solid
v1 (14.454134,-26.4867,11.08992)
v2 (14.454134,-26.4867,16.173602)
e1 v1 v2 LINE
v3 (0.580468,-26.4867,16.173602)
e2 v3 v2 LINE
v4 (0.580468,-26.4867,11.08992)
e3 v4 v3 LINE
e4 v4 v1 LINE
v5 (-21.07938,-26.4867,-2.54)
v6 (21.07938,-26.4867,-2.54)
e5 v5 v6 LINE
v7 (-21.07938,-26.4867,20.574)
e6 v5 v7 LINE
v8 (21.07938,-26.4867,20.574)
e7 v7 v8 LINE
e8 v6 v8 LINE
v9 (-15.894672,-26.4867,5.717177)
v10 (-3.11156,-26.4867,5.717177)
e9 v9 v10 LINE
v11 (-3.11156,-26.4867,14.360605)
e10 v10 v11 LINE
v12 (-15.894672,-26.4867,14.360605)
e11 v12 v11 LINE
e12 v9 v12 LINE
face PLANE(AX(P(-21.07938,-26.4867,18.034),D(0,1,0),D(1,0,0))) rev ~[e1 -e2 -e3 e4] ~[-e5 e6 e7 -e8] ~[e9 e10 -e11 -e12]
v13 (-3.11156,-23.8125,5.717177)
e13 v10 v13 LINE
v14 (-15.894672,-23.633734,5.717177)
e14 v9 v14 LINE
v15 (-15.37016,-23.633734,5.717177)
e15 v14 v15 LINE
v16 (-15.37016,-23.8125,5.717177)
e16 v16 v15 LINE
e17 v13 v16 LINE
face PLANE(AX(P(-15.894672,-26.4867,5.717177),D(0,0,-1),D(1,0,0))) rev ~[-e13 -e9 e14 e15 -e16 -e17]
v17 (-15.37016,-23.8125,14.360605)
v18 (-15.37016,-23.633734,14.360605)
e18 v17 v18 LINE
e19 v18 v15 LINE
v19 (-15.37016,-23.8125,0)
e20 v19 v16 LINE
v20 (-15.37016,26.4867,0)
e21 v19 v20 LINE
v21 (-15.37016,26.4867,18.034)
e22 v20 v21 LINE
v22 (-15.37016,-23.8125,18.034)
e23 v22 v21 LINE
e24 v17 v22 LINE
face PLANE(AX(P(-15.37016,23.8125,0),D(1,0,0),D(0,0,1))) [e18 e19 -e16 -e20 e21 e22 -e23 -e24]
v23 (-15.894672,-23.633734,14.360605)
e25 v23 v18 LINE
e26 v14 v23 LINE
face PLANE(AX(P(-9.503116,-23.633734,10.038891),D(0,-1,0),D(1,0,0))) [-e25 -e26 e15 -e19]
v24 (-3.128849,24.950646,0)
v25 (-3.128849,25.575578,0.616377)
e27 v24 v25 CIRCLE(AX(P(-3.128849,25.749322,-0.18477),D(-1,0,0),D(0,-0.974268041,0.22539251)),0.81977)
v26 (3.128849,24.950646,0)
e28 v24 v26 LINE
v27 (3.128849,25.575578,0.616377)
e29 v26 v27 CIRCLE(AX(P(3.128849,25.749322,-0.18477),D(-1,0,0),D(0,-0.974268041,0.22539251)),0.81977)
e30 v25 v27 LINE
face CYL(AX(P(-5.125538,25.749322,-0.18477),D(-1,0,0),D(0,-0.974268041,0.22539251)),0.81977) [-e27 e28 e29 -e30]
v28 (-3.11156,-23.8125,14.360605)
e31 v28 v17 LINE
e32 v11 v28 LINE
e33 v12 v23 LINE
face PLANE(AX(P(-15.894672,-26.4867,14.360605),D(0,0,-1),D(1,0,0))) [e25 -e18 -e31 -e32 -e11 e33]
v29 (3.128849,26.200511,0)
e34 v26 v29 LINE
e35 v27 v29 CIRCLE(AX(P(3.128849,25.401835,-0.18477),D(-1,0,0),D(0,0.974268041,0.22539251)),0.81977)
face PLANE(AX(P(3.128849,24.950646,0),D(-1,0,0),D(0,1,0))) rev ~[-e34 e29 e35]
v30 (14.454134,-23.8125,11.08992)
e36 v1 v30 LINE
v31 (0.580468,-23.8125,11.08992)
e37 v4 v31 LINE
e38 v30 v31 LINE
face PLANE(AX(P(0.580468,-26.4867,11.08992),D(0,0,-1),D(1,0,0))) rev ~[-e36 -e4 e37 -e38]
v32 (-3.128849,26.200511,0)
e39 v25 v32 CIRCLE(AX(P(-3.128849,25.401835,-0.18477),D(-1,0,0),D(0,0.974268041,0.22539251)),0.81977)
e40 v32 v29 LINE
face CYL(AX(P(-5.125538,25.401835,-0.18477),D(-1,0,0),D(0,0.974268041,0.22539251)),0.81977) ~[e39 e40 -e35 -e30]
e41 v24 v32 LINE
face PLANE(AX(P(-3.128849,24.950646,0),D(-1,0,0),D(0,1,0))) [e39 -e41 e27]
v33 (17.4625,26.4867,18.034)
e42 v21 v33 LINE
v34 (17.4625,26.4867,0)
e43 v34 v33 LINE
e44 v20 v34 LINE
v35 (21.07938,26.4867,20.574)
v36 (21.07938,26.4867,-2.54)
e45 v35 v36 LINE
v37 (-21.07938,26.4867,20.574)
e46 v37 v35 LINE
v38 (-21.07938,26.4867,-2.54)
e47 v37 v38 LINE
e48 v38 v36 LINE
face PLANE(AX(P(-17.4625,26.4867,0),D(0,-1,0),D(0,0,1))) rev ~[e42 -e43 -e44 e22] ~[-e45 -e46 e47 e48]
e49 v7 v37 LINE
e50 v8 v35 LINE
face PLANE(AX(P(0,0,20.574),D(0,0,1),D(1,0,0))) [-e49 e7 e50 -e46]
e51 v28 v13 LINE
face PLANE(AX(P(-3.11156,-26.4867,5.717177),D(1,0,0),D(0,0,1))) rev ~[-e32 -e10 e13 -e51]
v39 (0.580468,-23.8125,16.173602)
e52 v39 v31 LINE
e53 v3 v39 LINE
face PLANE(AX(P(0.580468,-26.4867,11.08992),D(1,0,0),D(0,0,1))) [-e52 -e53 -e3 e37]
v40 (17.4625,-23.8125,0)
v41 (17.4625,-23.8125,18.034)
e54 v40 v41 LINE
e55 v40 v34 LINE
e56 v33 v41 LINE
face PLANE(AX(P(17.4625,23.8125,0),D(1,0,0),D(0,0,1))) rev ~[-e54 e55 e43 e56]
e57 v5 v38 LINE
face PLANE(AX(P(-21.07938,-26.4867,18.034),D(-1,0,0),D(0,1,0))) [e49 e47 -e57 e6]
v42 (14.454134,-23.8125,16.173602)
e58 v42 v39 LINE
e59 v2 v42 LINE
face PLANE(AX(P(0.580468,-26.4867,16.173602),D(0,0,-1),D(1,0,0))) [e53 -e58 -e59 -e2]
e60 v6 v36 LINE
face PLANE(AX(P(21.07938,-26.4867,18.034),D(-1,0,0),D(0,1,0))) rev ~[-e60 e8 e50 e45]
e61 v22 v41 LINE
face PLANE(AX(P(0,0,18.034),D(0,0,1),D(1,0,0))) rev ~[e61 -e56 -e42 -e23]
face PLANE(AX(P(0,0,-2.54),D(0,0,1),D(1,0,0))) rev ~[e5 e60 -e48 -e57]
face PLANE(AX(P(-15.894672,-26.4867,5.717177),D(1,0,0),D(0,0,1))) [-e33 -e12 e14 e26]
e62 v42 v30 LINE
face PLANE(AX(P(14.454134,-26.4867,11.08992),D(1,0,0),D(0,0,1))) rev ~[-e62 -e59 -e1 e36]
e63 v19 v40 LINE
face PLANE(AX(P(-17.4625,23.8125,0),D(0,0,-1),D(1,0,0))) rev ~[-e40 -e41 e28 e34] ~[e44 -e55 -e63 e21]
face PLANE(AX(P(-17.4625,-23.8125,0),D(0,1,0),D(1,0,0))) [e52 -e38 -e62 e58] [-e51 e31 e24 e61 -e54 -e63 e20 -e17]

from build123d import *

# Parameters (mm, degrees)
F0_W         = 42.1587601304
F0_H         = 52.9734008014
F0_W_2       = 34.925
F0_H_2       = 47.625
F1_DEPTH     = 18.034
F2_DEPTH     = 2.54
F3_W         = 34.925
F3_H         = 18.034
F2_FACE_W    = 42.1587601304
F2_FACE_H    = 20.574
F4_DEPTH     = 10.32974
F5_W         = 42.1587601304
F5_H         = 52.9734008014
F6_DEPTH     = 2.54
F7_W         = 13.8736660592
F7_H         = 5.0836820155
F8_DEPTH     = 25.4
F9_W         = 6.2576979399
F9_H         = 1.2498646975
F10_DEPTH    = 0.635
F11_T1_DEPTH = 10.2510766125
F12_DEPTH    = 2.0923395641
F13_W        = 12.7831122372
F13_H        = 8.6434278637
F14_DEPTH    = 2.8529665433


# Not quite as in the source:
# - a fillet or chamfer that OpenCascade refuses, or shapes differently, is made with other operations: its cross-section is extruded or revolved along the edge and cut away or added


with BuildPart() as f1:
    # F0 (on Top) → F1 (new body)
    with BuildSketch(Plane.XY):
        Rectangle(F0_W, F0_H)
        Rectangle(F0_W_2, F0_H_2, mode=Mode.SUBTRACT)
    extrude(amount=F1_DEPTH)

    # F0 (on Top) → F2 (join)
    with BuildSketch(Plane.XY):
        Rectangle(F0_W, F0_H)
        Rectangle(F0_W_2, F0_H_2, mode=Mode.SUBTRACT)
        Rectangle(F0_W_2, F0_H_2)
    extrude(amount=-F2_DEPTH)

    # F3 (on face) + F2_face (on face) → F4 (cut)
    with BuildSketch(Plane.XZ.offset(-23.8125)):
        with Locations((0, 9.017)):
            Rectangle(F3_W, F3_H)
    with BuildSketch(Plane(origin=(0, 26.4867004007, 7.747), x_dir=(-1, 0, 0), z_dir=(0, 1, 0))):
        Rectangle(F2_FACE_W, F2_FACE_H)
    extrude(amount=-F4_DEPTH, dir=(0, -1, 0), mode=Mode.SUBTRACT)

    # F5 (on face) → F6 (join)
    with BuildSketch(Plane.XY.offset(18.034)):
        Rectangle(F5_W, F5_H)
    extrude(amount=F6_DEPTH)

    # F7 (on face) → F8 (cut)
    with BuildSketch(Plane.XZ.offset(26.4867004007)):
        with Locations((7.517300779, 13.6317610741)):
            Rectangle(F7_W, F7_H)
    extrude(amount=-F8_DEPTH, mode=Mode.SUBTRACT)

    # F9 (on face) → F10 (join)
    with BuildSketch(Plane.XY):
        with Locations((0, 25.5755782127)):
            Rectangle(F9_W, F9_H)
    extrude(amount=F10_DEPTH)

    # F11: fillet of radius 0.8197700228 on 2 edges, made by hand

    # F11_s2 → F11_t1 (cut)
    with BuildSketch(Plane.YZ.offset(-5.1255383063)):
        with BuildLine():
            ThreePointArc((26.2005105615, 0), (25.9120083094, 0.4569042778), (25.4018348269, 0.635))
            Line((25.4018348269, 0.635), (26.2005105615, 0.635))
            Line((26.2005105615, 0.635), (26.2005105615, 0))
        make_face()
        with BuildLine():
            ThreePointArc((24.950645864, 0), (25.2391481161, 0.4569042778), (25.7493215985, 0.635))
            Line((25.7493215985, 0.635), (24.950645864, 0.635))
            Line((24.950645864, 0.635), (24.950645864, 0))
        make_face()
    extrude(amount=F11_T1_DEPTH, mode=Mode.SUBTRACT)

    # F12 (add): a face of the model
    f12_faces = [f1.faces().sort_by_distance(p)[0] for p in [
        (-17.4625, 1.3371002004, 9.017),
    ]]
    extrude(f12_faces, amount=F12_DEPTH)

    # F13 (on face) → F14 (cut)
    with BuildSketch(Plane.XZ.offset(26.4867004007)):
        with Locations((-9.5031157834, 10.0388908759)):
            Rectangle(F13_W, F13_H)
    extrude(amount=-F14_DEPTH, mode=Mode.SUBTRACT)


solid = f1.part
